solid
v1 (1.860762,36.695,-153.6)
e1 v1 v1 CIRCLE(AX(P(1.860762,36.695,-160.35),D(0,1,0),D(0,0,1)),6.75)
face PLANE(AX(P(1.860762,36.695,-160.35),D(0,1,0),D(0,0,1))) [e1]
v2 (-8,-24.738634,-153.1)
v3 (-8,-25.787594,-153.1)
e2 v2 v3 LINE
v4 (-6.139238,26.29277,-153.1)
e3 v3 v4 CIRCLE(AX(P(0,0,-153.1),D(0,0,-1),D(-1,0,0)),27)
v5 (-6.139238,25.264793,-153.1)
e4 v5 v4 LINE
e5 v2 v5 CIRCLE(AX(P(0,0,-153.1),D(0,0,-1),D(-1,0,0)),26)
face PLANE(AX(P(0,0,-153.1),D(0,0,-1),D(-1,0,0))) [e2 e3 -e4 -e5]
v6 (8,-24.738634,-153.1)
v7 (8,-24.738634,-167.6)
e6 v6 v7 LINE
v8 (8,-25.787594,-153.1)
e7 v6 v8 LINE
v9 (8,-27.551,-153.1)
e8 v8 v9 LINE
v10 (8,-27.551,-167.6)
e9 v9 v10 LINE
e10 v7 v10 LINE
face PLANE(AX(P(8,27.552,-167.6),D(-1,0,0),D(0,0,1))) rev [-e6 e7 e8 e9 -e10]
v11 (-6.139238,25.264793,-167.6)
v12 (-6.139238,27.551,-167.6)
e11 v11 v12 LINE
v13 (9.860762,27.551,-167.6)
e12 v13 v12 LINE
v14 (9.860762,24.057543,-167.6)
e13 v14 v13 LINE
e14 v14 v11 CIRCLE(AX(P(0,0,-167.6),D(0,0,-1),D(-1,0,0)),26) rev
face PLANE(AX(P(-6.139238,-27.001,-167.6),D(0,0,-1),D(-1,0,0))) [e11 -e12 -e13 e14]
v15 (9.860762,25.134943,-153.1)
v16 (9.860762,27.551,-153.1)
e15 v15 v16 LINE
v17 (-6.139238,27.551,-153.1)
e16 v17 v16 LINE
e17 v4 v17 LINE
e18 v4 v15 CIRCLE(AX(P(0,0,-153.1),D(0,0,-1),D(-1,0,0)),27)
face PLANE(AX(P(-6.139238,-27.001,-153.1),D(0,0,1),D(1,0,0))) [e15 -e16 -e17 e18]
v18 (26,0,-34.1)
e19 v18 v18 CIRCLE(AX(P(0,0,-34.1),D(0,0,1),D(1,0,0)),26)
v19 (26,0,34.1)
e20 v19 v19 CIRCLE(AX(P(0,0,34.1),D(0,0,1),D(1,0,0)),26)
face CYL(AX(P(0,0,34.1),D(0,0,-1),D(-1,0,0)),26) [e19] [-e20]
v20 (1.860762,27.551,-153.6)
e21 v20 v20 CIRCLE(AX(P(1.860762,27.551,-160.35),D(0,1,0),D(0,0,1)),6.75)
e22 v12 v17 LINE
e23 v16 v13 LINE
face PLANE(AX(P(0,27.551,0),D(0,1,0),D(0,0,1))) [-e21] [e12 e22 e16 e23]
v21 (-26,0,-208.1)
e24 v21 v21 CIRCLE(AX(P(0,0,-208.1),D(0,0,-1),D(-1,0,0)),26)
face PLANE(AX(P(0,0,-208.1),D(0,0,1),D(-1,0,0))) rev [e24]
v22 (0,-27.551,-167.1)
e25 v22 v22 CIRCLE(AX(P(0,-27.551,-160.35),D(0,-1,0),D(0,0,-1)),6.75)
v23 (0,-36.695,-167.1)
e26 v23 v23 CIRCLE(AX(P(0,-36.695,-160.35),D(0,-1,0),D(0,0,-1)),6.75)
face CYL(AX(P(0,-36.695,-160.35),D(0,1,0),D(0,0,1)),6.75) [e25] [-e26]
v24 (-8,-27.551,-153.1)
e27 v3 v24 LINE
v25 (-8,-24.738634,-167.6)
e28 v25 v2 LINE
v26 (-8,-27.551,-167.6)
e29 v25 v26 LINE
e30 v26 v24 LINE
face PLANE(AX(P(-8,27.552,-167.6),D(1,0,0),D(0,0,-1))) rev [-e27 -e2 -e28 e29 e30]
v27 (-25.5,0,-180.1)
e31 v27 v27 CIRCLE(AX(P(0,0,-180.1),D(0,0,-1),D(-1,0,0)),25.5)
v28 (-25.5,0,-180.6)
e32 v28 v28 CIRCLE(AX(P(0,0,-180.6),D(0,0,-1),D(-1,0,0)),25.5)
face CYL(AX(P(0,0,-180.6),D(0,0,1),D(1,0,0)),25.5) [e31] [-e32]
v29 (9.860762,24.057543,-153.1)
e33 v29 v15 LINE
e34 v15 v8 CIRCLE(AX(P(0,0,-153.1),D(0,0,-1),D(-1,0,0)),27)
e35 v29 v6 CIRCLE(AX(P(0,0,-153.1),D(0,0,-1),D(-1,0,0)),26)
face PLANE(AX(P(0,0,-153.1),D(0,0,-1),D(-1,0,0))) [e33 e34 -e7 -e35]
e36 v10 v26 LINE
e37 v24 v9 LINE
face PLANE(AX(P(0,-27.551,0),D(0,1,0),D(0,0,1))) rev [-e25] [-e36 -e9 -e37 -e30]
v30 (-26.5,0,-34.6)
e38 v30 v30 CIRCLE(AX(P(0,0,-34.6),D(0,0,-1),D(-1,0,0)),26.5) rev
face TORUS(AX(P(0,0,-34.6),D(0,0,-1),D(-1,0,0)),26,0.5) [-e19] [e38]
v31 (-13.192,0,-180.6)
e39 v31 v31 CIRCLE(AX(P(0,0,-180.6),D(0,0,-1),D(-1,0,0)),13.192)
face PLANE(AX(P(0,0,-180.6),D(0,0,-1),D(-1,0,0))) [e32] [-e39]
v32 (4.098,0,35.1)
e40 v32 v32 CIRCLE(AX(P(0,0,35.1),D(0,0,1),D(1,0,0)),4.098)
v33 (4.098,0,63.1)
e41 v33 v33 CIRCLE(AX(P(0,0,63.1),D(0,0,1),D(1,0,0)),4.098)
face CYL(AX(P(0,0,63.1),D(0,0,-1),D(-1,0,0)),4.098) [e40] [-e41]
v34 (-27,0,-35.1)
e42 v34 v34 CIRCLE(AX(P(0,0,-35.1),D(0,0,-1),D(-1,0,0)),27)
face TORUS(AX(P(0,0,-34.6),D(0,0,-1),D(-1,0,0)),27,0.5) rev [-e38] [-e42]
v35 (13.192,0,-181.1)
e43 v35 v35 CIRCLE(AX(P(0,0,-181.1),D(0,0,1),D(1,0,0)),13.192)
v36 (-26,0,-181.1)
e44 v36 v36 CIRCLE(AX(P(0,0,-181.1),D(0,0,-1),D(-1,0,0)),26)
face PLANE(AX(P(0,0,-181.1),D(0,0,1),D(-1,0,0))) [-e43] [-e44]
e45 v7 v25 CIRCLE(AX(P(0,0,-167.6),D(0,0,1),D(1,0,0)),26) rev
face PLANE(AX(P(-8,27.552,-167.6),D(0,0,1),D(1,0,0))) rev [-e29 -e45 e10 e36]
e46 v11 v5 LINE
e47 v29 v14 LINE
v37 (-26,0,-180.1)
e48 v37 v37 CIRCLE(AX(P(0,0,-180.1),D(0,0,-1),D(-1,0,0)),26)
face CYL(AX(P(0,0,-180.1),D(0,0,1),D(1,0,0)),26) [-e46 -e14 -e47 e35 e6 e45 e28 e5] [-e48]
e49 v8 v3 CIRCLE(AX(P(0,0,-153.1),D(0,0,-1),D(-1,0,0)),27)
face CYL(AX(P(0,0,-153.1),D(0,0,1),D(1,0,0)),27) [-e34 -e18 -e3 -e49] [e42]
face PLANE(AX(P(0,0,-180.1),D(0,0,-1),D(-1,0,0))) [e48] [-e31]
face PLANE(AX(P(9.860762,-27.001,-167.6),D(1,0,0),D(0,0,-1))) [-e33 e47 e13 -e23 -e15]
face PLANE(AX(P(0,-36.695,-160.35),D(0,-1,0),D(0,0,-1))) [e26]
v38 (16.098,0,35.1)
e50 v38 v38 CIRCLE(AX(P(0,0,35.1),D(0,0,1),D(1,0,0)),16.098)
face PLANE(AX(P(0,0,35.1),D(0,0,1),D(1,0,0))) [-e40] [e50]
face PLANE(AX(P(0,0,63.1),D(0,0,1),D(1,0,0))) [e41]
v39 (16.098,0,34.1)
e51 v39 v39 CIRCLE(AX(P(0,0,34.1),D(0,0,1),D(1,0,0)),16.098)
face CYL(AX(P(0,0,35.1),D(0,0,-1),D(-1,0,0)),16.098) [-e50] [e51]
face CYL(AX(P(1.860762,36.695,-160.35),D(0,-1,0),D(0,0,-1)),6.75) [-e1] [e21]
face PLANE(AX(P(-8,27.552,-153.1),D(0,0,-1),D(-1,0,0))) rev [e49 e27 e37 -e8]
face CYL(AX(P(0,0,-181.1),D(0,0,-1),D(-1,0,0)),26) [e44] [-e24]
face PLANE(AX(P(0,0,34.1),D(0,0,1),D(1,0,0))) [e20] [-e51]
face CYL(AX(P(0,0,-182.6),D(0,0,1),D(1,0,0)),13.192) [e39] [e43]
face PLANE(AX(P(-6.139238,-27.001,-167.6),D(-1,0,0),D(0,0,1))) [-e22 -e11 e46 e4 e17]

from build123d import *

# Parameters (mm, degrees)
SKETCH1_R                 = 26
BOSS_EXTRUDE3_DEPTH       = 34.1
SKETCH4_R                 = 16.098
BOSS_EXTRUDE4_DEPTH       = 1
SKETCH5_R                 = 4.098
BOSS_EXTRUDE5_DEPTH       = 28
SKETCH7_R                 = 26.5
BOSS_EXTRUDE6_DEPTH       = 1
SKETCH8_R                 = 27
BOSS_EXTRUDE8_DEPTH       = 118
SKETCH12_R                = 26
BOSS_EXTRUDE9_DEPTH       = 27
SKETCH13_R                = 25.5
BOSS_EXTRUDE10_DEPTH      = 0.5
SKETCH16_R                = 13.192
BOSS_EXTRUDE12_DEPTH      = 2
SKETCH19_R                = 2.408
BOSS_EXTRUDE13_DEPTH      = 1
BOSS_EXTRUDE14_REACH      = 195.426
BOSS_EXTRUDE14_END_RADIUS = 26
SKETCH20_W                = 16
SKETCH20_H                = 14.5
FILLET2_R                 = 0.5
MIRROR2_START             = -208.1
MIRROR2_OUTLINE_R         = 26
MIRROR2_DEPTH             = 27
BOSS_EXTRUDE17_REACH      = 218.958
BOSS_EXTRUDE17_END_RADIUS = 26
SKETCH24_W                = 16
SKETCH24_H                = 14.5
SKETCH25_R                = 6.75
BOSS_EXTRUDE18_DEPTH      = 9.144
SKETCH26_R                = 6.75
BOSS_EXTRUDE19_DEPTH      = 9.144


# Read off the part's stored shape, not the designer's step: Mirror2
with BuildPart() as part:
    # Sketch1 → Boss-Extrude3 (new, symmetric)
    with BuildSketch(Plane.XY):
        Circle(SKETCH1_R)
    extrude(amount=BOSS_EXTRUDE3_DEPTH, both=True)

    # Sketch4 → Boss-Extrude4 (add)
    with BuildSketch(Plane.XY.offset(34.1)):
        Circle(SKETCH4_R)
    extrude(amount=BOSS_EXTRUDE4_DEPTH)

    # Sketch5 → Boss-Extrude5 (add)
    with BuildSketch(Plane.XY.offset(35.1)):
        Circle(SKETCH5_R)
    extrude(amount=BOSS_EXTRUDE5_DEPTH)

    # Sketch7 → Boss-Extrude6 (add)
    with BuildSketch(Plane(origin=(0, 0, -34.1), x_dir=(-1, 0, 0), z_dir=(0, 0, -1))):
        Circle(SKETCH7_R)
    extrude(amount=BOSS_EXTRUDE6_DEPTH)

    # Sketch8 → Boss-Extrude8 (add)
    with BuildSketch(Plane(origin=(0, 0, -35.1), x_dir=(-1, 0, 0), z_dir=(0, 0, -1))):
        Circle(SKETCH8_R)
    extrude(amount=BOSS_EXTRUDE8_DEPTH)

    # Sketch12 → Boss-Extrude9 (add)
    with BuildSketch(Plane(origin=(0, 0, -153.1), x_dir=(-1, 0, 0), z_dir=(0, 0, -1))):
        with Locations(Location((0, 0, 0), (0, 0, 180))):
            Circle(SKETCH12_R)
    extrude(amount=BOSS_EXTRUDE9_DEPTH)

    # Sketch13 → Boss-Extrude10 (add)
    with BuildSketch(Plane(origin=(0, 0, -180.1), x_dir=(-1, 0, 0), z_dir=(0, 0, -1))):
        Circle(SKETCH13_R)
    extrude(amount=BOSS_EXTRUDE10_DEPTH)

    # Sketch16 → Boss-Extrude12 (add)
    with BuildSketch(Plane(origin=(0, 0, -180.6), x_dir=(-1, 0, 0), z_dir=(0, 0, -1))):
        Circle(SKETCH16_R)
    extrude(amount=BOSS_EXTRUDE12_DEPTH)

    # Sketch19 → Boss-Extrude13 (add)
    with BuildSketch(Plane(origin=(0, 0, -182.6), x_dir=(-1, 0, 0), z_dir=(0, 0, -1))):
        Circle(SKETCH19_R)
    extrude(amount=BOSS_EXTRUDE13_DEPTH)

    # Boss-Extrude14: up to this cylinder (the profile starts outside it)
    boss_extrude14_end = Plane(origin=(0, 0, -160.35), z_dir=(0, 0, 1)) * Cylinder(BOSS_EXTRUDE14_END_RADIUS, 443.852, mode=Mode.PRIVATE)
    # Sketch20 → Boss-Extrude14 (add, up to the surface)
    with BuildSketch(Plane(origin=(0, 27.551, 0), x_dir=(1, 0, 0), z_dir=(0, 1, 0)), mode=Mode.PRIVATE) as boss_extrude14_sk1:
        with Locations((1.860761864, 160.35)):
            Rectangle(SKETCH20_W, SKETCH20_H)
    boss_extrude14_tool1 = extrude(boss_extrude14_sk1.sketch, amount=-BOSS_EXTRUDE14_REACH, mode=Mode.PRIVATE) - boss_extrude14_end
    add(boss_extrude14_tool1.solids().sort_by_distance((1.860762, 27.551, -160.35))[0])

    # Fillet2
    fillet2_edges = [part.edges().sort_by_distance(p)[0] for p in [
        (26.5, 0, -34.1),
        (26.5, 0, -35.1),
    ]]
    fillet(fillet2_edges, radius=FILLET2_R - 0.0001)  # a hair under: the kernel refuses the full size

    # Mirror2 outline → Mirror2 (add)
    with BuildSketch(Plane.XY.offset(MIRROR2_START)):
        Circle(MIRROR2_OUTLINE_R)
    extrude(amount=MIRROR2_DEPTH)

    # Boss-Extrude17: up to this cylinder (the profile starts outside it)
    boss_extrude17_end = Plane(origin=(0, 0, -160.35), z_dir=(0, 0, 1)) * Cylinder(BOSS_EXTRUDE17_END_RADIUS, 490.916, mode=Mode.PRIVATE)
    # Sketch24 → Boss-Extrude17 (add, up to the surface)
    with BuildSketch(Plane(origin=(0, -27.551, 0), x_dir=(1, 0, 0), z_dir=(0, 1, 0)), mode=Mode.PRIVATE) as boss_extrude17_sk1:
        with Locations((0, 160.35)):
            Rectangle(SKETCH24_W, SKETCH24_H)
    boss_extrude17_tool1 = extrude(boss_extrude17_sk1.sketch, amount=BOSS_EXTRUDE17_REACH, mode=Mode.PRIVATE) - boss_extrude17_end
    add(boss_extrude17_tool1.solids().sort_by_distance((0, -27.551, -160.35))[0])

    # Sketch25 → Boss-Extrude18 (add)
    with BuildSketch(Plane(origin=(0, -27.551, 0), x_dir=(-1, 0, 0), z_dir=(0, -1, 0))):
        with Locations(Location((0, 160.35, 0), (0, 0, 90))):
            Circle(SKETCH25_R)
    extrude(amount=BOSS_EXTRUDE18_DEPTH)

    # Sketch26 → Boss-Extrude19 (add)
    with BuildSketch(Plane(origin=(0, 27.551, 0), x_dir=(1, 0, 0), z_dir=(0, 1, 0))):
        with Locations(Location((1.860761864, 160.35, 0), (0, 0, 270))):
            Circle(SKETCH26_R)
    extrude(amount=BOSS_EXTRUDE19_DEPTH)


solid = part.part
